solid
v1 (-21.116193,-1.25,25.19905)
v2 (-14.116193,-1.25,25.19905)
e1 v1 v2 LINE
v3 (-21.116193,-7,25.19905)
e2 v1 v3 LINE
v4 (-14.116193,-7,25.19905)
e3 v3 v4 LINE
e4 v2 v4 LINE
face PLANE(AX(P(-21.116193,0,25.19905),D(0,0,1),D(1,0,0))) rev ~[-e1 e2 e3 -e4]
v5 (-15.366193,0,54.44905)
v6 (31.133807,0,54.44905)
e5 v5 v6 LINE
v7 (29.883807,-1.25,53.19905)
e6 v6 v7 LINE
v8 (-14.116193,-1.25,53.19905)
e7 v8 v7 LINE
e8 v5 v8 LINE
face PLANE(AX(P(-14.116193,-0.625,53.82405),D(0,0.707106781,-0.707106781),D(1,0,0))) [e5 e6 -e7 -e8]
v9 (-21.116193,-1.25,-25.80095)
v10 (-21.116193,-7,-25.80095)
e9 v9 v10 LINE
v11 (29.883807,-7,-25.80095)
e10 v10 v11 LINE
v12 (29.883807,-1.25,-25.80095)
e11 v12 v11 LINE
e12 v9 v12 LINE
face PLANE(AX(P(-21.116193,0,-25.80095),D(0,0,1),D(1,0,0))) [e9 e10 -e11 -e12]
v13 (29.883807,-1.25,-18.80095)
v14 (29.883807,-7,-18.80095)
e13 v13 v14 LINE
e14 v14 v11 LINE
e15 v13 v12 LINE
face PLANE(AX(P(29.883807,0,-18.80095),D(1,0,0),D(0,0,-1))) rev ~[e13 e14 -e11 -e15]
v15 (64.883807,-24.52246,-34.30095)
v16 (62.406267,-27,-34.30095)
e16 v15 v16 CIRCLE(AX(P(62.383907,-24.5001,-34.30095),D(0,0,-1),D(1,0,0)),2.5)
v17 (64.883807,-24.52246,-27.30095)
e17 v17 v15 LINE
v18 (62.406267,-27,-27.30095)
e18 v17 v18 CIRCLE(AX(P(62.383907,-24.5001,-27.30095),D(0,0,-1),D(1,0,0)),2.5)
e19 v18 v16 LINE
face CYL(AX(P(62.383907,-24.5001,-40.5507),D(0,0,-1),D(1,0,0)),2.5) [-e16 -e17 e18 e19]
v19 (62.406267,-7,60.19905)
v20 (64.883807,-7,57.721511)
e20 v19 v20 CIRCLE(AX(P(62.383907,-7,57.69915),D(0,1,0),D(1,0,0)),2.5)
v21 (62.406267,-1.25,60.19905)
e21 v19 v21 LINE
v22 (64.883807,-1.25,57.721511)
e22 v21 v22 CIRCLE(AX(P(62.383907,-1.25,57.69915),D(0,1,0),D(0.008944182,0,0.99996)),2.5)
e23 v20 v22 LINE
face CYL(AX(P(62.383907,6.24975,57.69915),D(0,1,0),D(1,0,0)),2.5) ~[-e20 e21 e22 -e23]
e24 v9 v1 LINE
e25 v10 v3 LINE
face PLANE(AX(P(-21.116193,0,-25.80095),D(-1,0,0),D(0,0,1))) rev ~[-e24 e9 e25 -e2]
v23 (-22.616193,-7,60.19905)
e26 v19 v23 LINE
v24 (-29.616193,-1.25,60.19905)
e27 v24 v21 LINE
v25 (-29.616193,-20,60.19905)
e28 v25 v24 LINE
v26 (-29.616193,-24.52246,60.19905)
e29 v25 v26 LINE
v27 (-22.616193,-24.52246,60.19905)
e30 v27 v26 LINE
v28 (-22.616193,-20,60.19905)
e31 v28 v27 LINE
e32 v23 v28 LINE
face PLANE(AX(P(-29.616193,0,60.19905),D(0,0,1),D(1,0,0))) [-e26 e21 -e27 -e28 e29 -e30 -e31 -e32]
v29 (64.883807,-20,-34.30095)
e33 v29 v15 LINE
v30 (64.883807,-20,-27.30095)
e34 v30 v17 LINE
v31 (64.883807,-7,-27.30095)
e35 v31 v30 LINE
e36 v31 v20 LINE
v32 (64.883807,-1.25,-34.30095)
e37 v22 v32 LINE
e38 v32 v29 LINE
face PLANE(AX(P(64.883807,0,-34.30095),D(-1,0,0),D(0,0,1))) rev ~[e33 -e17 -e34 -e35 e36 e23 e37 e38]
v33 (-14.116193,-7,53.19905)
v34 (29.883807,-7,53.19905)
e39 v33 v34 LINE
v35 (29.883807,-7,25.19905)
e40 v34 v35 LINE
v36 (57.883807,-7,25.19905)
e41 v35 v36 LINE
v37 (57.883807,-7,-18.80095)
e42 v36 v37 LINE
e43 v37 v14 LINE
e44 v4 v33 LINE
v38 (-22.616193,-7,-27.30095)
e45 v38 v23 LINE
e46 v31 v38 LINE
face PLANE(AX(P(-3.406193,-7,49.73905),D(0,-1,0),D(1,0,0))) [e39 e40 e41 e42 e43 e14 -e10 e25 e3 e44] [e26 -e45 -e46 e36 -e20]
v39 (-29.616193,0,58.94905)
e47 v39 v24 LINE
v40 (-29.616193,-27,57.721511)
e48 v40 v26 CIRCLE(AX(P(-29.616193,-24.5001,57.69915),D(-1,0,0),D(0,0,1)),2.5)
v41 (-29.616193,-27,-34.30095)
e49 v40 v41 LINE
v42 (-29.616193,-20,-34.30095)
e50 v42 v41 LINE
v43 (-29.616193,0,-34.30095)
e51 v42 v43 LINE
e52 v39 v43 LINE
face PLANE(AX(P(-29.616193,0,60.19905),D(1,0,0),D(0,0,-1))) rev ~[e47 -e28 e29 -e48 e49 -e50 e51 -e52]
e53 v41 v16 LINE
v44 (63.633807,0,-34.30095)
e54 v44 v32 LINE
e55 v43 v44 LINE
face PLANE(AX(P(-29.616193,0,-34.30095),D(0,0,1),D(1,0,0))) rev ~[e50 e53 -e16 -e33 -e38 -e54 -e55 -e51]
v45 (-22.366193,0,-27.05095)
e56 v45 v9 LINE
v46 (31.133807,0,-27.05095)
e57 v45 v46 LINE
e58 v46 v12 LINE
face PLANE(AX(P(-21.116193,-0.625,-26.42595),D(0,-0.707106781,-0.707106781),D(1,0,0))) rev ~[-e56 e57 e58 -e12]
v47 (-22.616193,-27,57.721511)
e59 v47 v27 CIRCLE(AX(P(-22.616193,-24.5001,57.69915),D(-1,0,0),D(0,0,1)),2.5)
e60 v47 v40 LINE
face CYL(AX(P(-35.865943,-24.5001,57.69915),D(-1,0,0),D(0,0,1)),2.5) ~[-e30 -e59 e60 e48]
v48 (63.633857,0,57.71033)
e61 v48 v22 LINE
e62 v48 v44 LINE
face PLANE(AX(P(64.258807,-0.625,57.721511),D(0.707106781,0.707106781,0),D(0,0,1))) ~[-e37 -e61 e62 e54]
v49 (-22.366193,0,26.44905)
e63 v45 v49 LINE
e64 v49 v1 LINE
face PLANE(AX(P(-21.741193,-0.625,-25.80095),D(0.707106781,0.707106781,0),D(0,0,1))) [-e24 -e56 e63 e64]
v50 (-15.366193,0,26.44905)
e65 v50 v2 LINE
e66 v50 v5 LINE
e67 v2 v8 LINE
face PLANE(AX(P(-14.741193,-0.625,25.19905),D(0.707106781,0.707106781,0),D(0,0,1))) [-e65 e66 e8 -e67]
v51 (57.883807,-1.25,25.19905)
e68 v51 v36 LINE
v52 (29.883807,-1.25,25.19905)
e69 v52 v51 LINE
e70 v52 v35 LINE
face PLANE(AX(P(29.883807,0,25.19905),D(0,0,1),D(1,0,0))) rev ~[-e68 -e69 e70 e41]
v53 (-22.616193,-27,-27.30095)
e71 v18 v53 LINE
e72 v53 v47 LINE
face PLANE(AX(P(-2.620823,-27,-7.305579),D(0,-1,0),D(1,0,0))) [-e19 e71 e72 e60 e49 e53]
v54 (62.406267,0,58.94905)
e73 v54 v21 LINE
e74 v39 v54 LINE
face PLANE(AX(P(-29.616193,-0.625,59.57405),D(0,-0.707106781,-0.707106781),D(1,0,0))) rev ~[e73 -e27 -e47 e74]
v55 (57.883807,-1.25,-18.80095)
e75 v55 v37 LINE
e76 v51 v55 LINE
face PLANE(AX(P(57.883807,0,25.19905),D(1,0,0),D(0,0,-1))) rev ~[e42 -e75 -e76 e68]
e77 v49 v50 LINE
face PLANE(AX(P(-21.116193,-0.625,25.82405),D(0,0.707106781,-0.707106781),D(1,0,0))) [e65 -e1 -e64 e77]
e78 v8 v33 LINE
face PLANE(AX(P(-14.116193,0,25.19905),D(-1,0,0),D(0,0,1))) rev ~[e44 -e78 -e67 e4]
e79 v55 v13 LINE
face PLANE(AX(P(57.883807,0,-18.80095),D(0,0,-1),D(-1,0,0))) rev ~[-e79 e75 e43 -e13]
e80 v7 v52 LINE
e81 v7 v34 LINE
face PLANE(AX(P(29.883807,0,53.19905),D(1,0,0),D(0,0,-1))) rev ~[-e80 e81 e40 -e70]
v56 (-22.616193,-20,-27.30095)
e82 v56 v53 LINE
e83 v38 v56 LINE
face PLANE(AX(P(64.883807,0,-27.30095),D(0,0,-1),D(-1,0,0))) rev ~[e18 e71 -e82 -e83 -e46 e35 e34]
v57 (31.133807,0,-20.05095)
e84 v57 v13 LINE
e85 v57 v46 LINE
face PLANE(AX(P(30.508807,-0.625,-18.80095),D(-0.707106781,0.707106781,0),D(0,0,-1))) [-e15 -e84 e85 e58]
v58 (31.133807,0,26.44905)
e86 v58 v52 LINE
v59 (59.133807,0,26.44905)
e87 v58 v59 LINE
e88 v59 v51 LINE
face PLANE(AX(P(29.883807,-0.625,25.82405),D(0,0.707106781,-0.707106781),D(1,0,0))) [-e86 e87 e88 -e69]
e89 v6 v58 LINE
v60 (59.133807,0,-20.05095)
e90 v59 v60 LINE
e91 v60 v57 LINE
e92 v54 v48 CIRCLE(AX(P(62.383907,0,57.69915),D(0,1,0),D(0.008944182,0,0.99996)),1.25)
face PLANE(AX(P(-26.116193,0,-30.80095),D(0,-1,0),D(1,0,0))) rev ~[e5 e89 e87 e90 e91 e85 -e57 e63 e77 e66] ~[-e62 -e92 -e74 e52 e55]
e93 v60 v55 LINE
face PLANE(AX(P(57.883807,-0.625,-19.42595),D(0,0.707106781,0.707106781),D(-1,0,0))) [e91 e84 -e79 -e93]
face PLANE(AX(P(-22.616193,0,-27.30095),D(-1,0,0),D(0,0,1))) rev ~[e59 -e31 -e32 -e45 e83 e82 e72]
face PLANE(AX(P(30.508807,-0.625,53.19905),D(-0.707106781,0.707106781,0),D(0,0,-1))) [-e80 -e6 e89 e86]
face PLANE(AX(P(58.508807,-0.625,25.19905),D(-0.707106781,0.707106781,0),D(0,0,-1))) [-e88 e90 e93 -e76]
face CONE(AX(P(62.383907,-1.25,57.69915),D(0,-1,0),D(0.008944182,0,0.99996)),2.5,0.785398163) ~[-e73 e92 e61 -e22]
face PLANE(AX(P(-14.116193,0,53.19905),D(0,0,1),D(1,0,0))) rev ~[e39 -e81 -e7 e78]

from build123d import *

# Parameters (mm, degrees)
F0_W        = 7
F0_H        = 7
F0_W_2      = 35
F0_H_2      = 52.5
F0_H_3      = 35
F1_DEPTH    = 20
F0_W_3      = 51
F0_H_4      = 1.5
F2_DEPTH    = 7
F3_T1_DEPTH = 19.49950001
F3_T3_DEPTH = 19.49950001
F3_T5_DEPTH = 19.49950001
F4_SIZE     = 1.25


# Not quite as in the source:
# - a fillet or chamfer that OpenCascade refuses, or shapes differently, is made with other operations: its cross-section is extruded or revolved along the edge and cut away or added


with BuildPart() as f1:
    # F0 (on Front) → F1 (new body)
    with BuildSketch(Plane.XZ):
        with Locations((-26.1161934872, -30.8009498573)):
            Rectangle(F0_W, F0_H)
        with Locations((47.3838065128, -30.8009498573)):
            Rectangle(F0_W_2, F0_H)
        with Locations((-26.1161934872, -1.0509498573)):
            Rectangle(F0_W, F0_H_2)
        Polygon((-21.1161934872, -27.3009498573), (-22.6161934872, -27.3009498573), (-22.6161934872, -34.3009498573), (29.8838065128, -34.3009498573), (29.8838065128, -27.3009498573), align=None)
        with Locations((-26.1161934872, 42.6990501427)):
            Rectangle(F0_W, F0_H_3)
    extrude(amount=F1_DEPTH)

    # F0 (on Front) + F1_face (on face) → F2 (join)
    with BuildSketch(Plane.XZ):
        Polygon((-22.6161934872, 60.1990501427), (-22.6161934872, 25.1990501427), (-21.1161934872, 25.1990501427), (-14.1161934872, 25.1990501427), (-14.1161934872, 53.1990501427), (29.8838065128, 53.1990501427), (29.8838065128, 60.1990501427), align=None)
        Polygon((-21.1161934872, -27.3009498573), (-22.6161934872, -27.3009498573), (-22.6161934872, -34.3009498573), (29.8838065128, -34.3009498573), (29.8838065128, -27.3009498573), align=None)
        with Locations((-26.1161934872, 42.6990501427)):
            Rectangle(F0_W, F0_H_3)
        with Locations((-26.1161934872, -1.0509498573)):
            Rectangle(F0_W, F0_H_2)
        Polygon((29.8838065128, -18.8009498573), (29.8838065128, -25.8009498573), (29.8838065128, -27.3009498573), (64.8838065128, -27.3009498573), (64.8838065128, 25.1990501427), (57.8838065128, 25.1990501427), (57.8838065128, -18.8009498573), align=None)
        with Locations((-26.1161934872, -30.8009498573)):
            Rectangle(F0_W, F0_H)
        Polygon((64.8838065128, 60.1990501427), (29.8838065128, 60.1990501427), (29.8838065128, 53.1990501427), (29.8838065128, 25.1990501427), (57.8838065128, 25.1990501427), (64.8838065128, 25.1990501427), align=None)
        with Locations((47.3838065128, -30.8009498573)):
            Rectangle(F0_W_2, F0_H)
        Polygon((-21.1161934872, 25.1990501427), (-22.6161934872, 25.1990501427), (-22.6161934872, -27.3009498573), (-21.1161934872, -27.3009498573), (-21.1161934872, -25.8009498573), align=None)
        with Locations((4.3838065128, -26.5509498573)):
            Rectangle(F0_W_3, F0_H_4)
    with BuildSketch(Plane(origin=(-3.3998473333, -20, -8.0846037034), x_dir=(1, 0, 0), z_dir=(0, -1, 0))):
        Polygon((-26.2163461538, -26.2163461538), (68.2836538462, -26.2163461538), (68.2836538462, -19.2163461538), (-19.2163461538, -19.2163461538), (-19.2163461538, 68.2836538462), (-26.2163461538, 68.2836538462), align=None)
    extrude(amount=F2_DEPTH)

    # F3: fillet of radius 2.5 on 3 edges, made by hand

    # F3_s2 → F3_t1 (cut)
    with BuildSketch(Plane.YZ.offset(-35.8659434922)):
        with BuildLine():
            ThreePointArc((-24.5001, 60.1991501427), (-26.267866953, 59.4669170957), (-27.0001, 57.6991501427))
            Line((-27.0001, 57.6991501427), (-27.0501, 57.6991501427))
            ThreePointArc((-27.0501, 57.6991501427), (-27.05, 58.9491001427), (-27.05, 60.1990501427))
            Line((-27.05, 60.1990501427), (-27, 60.2490501427))
            ThreePointArc((-27, 60.2490501427), (-25.75005, 60.2490501427), (-24.5001, 60.2491501427))
            Line((-24.5001, 60.2491501427), (-24.5001, 60.1991501427))
        make_face()
    extrude(amount=F3_T1_DEPTH, mode=Mode.SUBTRACT)

    # F3_s4 → F3_t3 (cut)
    with BuildSketch(Plane.XY.offset(-40.5506998623)):
        with BuildLine():
            ThreePointArc((64.8839065128, -24.5001), (64.1516734658, -26.267866953), (62.3839065128, -27.0001))
            Line((62.3839065128, -27.0001), (62.3839065128, -27.0501))
            ThreePointArc((62.3839065128, -27.0501), (63.6338565128, -27.05), (64.8838065128, -27.05))
            Line((64.8838065128, -27.05), (64.9338065128, -27))
            ThreePointArc((64.9338065128, -27), (64.9338065128, -25.75005), (64.9339065128, -24.5001))
            Line((64.9339065128, -24.5001), (64.8839065128, -24.5001))
        make_face()
    extrude(amount=F3_T3_DEPTH, mode=Mode.SUBTRACT)

    # F3_s6 → F3_t5 (cut)
    with BuildSketch(Plane.XZ.offset(-6.249750005)):
        with BuildLine():
            ThreePointArc((64.8839065128, 57.6991501427), (64.1516734658, 59.4669170957), (62.3839065128, 60.1991501427))
            Line((62.3839065128, 60.1991501427), (62.3839065128, 60.2491501427))
            ThreePointArc((62.3839065128, 60.2491501427), (63.6338565128, 60.2490501427), (64.8838065128, 60.2490501427))
            Line((64.8838065128, 60.2490501427), (64.9338065128, 60.1990501427))
            ThreePointArc((64.9338065128, 60.1990501427), (64.9338065128, 58.9491001427), (64.9339065128, 57.6991501427))
            Line((64.9339065128, 57.6991501427), (64.8839065128, 57.6991501427))
        make_face()
    extrude(amount=F3_T5_DEPTH, mode=Mode.SUBTRACT)

    # F4
    f4_edges = [f1.edges().sort_by_distance(p)[0] for p in [
        (43.883807, 0, 25.19905),
        (57.883807, 0, 3.19905),
        (43.883807, 0, -18.80095),
        (29.883807, 0, -22.30095),
        (4.383807, 0, -25.80095),
        (-21.116193, 0, -0.30095),
        (29.883807, 0, 39.19905),
        (7.883807, 0, 53.19905),
        (-14.116193, 0, 39.19905),
        (-17.616193, 0, 25.19905),
        (64.883807, 0, 11.71028),
        (16.395037, 0, 60.19905),
        (64.151673, 0, 59.466917),
    ]]
    chamfer(f4_edges, length=F4_SIZE)


solid = f1.part
